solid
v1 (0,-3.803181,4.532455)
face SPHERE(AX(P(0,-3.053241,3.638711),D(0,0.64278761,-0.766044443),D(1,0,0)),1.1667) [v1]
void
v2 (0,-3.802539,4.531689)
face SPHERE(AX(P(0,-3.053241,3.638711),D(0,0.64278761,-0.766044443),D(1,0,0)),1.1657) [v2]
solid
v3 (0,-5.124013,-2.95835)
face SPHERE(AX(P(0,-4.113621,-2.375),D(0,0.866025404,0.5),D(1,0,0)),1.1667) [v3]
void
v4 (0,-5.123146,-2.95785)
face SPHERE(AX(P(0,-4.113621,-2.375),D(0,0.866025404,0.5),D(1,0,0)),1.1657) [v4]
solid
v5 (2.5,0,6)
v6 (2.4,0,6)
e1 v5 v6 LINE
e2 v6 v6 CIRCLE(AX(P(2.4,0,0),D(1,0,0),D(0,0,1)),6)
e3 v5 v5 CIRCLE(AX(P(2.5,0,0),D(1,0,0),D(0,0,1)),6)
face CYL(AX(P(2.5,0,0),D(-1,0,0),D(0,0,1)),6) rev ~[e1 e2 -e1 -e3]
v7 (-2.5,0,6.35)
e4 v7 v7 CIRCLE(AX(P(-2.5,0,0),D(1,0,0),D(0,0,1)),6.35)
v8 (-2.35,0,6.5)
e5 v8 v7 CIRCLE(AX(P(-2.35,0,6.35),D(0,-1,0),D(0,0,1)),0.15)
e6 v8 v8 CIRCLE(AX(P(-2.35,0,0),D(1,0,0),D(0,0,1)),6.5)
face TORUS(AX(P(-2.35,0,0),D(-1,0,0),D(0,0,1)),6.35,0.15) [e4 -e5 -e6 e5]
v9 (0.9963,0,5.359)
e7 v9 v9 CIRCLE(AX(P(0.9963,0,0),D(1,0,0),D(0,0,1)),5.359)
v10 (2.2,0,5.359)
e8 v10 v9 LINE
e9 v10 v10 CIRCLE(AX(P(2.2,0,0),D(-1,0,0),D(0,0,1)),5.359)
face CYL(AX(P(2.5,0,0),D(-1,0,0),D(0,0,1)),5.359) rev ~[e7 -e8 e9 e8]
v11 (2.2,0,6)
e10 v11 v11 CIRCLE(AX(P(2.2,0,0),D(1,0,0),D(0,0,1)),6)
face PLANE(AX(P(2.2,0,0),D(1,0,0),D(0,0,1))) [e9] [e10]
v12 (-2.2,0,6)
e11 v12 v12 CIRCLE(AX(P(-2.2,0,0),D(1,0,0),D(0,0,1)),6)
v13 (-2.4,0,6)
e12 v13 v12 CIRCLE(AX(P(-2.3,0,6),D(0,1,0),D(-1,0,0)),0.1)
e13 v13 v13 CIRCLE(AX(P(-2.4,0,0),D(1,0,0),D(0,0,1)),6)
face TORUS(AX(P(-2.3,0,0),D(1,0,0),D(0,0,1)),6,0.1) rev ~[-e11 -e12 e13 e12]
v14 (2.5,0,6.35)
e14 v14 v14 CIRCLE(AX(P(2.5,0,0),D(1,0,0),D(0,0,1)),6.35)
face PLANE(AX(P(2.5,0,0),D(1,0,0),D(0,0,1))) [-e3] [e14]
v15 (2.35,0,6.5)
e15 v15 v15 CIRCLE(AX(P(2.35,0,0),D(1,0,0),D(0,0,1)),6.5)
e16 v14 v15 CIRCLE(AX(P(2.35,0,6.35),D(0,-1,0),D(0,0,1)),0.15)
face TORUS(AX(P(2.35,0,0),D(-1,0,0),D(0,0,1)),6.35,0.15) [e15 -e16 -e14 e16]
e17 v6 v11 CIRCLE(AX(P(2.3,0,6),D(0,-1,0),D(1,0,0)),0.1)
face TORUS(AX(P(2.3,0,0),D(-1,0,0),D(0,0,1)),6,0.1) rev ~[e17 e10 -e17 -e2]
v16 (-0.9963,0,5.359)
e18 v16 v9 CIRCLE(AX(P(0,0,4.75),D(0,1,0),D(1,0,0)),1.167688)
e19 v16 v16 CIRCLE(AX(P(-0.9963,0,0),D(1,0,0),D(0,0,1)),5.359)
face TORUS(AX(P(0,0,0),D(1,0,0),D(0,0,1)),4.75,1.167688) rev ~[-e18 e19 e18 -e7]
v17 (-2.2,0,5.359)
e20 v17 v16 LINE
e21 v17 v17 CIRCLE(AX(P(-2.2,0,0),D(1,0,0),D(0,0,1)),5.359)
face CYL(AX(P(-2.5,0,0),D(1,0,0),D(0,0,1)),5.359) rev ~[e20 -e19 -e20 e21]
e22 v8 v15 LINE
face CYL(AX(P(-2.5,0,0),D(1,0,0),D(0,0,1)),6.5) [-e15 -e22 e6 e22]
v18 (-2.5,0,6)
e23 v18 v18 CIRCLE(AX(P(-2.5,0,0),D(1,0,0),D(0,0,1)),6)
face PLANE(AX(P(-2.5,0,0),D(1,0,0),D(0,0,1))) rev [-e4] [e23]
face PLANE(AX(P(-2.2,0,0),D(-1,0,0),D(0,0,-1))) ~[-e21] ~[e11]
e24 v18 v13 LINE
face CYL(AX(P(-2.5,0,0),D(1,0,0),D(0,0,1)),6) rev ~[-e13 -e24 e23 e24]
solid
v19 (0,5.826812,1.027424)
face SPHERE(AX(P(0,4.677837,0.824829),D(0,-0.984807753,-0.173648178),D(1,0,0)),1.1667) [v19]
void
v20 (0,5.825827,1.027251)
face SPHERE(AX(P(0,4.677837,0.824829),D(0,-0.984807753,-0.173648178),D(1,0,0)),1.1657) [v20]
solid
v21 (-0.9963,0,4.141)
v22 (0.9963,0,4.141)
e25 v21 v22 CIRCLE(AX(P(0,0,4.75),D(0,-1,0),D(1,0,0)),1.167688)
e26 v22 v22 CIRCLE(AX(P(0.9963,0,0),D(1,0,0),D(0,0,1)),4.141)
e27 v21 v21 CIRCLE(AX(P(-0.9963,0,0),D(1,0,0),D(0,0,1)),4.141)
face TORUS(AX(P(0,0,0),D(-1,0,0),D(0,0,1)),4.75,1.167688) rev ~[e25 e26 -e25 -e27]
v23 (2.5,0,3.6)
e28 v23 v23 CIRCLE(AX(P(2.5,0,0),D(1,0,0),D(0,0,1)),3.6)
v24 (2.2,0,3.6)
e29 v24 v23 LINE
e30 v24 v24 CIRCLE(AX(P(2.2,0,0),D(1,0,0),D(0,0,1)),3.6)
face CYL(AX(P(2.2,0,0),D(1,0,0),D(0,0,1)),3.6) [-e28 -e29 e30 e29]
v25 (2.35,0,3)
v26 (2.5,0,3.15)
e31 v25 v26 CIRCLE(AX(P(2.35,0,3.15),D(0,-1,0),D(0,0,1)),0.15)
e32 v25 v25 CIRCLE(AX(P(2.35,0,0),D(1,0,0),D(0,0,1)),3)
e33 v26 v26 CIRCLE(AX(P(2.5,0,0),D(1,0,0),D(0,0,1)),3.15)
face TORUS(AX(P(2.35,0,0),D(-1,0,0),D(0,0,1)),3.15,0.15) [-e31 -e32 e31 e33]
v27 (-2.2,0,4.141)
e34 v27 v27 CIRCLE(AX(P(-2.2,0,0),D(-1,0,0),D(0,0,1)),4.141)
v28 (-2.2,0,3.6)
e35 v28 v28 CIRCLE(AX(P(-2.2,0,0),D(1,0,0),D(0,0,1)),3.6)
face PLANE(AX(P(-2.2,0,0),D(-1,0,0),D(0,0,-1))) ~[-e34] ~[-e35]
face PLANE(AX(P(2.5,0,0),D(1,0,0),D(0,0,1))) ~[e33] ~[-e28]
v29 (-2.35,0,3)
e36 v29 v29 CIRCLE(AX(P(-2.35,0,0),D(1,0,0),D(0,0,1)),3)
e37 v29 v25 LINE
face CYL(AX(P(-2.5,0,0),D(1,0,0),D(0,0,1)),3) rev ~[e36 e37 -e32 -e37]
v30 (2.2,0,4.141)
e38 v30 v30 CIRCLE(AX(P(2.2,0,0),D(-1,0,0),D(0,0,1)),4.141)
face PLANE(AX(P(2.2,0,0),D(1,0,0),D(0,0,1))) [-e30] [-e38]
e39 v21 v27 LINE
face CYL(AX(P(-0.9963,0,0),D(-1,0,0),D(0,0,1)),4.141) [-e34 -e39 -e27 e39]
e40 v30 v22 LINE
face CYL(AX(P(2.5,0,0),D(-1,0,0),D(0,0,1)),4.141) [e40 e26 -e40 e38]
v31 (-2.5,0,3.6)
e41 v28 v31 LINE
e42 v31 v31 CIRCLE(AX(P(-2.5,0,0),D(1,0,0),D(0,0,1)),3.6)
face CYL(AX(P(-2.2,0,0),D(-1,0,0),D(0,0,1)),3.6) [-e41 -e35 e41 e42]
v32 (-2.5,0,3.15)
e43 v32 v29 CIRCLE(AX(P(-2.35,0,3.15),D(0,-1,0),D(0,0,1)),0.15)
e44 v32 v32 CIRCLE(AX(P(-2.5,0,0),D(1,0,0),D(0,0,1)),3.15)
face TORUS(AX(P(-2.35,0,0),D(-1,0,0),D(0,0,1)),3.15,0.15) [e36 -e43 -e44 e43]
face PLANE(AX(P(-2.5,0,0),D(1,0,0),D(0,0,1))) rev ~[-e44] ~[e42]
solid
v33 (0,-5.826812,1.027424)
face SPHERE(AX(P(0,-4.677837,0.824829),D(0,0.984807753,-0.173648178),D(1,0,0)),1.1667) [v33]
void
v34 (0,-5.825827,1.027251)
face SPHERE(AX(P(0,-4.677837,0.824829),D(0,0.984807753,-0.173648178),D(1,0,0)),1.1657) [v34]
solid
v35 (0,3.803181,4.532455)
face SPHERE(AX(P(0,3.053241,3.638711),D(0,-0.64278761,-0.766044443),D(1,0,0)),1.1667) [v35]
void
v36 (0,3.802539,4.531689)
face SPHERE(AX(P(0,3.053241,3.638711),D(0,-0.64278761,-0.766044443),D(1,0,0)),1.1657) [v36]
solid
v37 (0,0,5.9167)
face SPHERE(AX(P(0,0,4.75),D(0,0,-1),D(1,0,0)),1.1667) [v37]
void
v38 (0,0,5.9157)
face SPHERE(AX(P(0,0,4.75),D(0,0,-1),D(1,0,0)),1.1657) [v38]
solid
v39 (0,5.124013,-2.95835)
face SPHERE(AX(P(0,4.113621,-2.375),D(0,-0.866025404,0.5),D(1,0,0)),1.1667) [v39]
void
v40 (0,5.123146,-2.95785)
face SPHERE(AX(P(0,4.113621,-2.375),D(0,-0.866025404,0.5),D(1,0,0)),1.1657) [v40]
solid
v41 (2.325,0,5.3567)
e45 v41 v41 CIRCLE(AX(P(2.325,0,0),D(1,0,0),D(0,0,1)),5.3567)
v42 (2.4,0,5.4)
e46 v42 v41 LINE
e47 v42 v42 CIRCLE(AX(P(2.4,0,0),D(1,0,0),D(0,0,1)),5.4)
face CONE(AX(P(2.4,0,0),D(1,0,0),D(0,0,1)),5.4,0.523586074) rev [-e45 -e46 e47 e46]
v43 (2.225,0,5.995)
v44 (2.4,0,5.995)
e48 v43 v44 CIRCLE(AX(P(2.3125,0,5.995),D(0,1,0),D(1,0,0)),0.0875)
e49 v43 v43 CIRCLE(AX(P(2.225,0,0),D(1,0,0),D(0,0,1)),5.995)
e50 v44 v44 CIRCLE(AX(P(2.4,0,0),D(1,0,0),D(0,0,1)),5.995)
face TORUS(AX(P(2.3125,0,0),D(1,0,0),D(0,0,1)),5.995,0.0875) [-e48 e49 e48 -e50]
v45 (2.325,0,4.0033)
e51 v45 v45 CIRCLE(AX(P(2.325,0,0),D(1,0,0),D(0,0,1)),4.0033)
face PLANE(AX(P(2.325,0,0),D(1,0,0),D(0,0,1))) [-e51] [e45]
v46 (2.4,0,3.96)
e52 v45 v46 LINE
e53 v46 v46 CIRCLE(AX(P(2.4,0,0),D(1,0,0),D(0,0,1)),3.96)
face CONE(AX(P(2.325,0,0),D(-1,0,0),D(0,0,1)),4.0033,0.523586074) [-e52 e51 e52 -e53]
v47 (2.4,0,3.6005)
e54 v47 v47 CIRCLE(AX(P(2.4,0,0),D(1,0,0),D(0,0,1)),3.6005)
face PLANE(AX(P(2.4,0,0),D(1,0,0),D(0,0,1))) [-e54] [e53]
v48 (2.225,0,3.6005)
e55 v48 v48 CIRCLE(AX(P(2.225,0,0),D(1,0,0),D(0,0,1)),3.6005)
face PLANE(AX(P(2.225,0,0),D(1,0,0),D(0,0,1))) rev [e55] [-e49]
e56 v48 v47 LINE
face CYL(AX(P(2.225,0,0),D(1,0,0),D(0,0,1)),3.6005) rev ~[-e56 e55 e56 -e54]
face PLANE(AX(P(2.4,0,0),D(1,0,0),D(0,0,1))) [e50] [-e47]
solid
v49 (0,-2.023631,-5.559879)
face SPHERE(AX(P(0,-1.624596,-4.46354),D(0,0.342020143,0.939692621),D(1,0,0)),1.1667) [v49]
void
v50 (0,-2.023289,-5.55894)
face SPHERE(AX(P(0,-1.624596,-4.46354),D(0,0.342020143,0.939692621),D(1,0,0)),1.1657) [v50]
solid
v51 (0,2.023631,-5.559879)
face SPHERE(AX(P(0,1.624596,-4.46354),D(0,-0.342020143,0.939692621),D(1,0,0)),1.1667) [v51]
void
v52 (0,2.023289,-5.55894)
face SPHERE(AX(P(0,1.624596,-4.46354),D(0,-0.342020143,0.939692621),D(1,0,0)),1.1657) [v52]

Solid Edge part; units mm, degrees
sketch "Sketch1" plane through (0, 0, 0) normal (0, -1, 0) x (1, 0, 0)
  arc A0 (0, 5.9167) -> (0, 3.5833) centre (0, 4.75) cw
  dimension "D1" = 1.1667
revolve "RevolvedProtrusion1" add sketch "Sketch1" angle 360 about axis through (0, 0, 30.6346) along (0, 0, 1)
shell "Thinwall1" thickness 0.001 removed faces 0
pattern_circular "Pattern1" count 9 over 360 about axis through (0, 0, 0) along (1, 0, 0) of "RevolvedProtrusion1", "Thinwall1"
sketch "Sketch2" plane through (0, 0, 0) normal (0, -1, 0) x (1, 0, 0)
  line L0 (-2.5, 4.141) -> (-2.5, 3)
  line L1 (-2.5, 3) -> (2.5, 3)
  line L2 (2.5, 3) -> (2.5, 4.141)
  line L3 (2.5, 4.141) -> (0.9963, 4.141)
  arc A0 (-0.9963, 4.141) -> (0.9963, 4.141) centre (0, 4.75) ccw
  line L4 (-0.9963, 4.141) -> (-2.5, 4.141)
  line L5 (-2.5, 5.359) -> (-0.9963, 5.359)
  arc A1 (-0.9963, 5.359) -> (0.9963, 5.359) centre (0, 4.75) cw
  line L6 (2.5, 5.359) -> (0.9963, 5.359)
  line L7 (2.5, 6.5) -> (2.5, 5.359)
  line L8 (-2.5, 6.5) -> (2.5, 6.5)
  line L9 (-2.5, 5.359) -> (-2.5, 6.5)
  dimension "D1" = 5
  dimension "D2" = 1.1677
  dimension "D3" = 1.1677
revolve "RevolvedProtrusion2" add sketch "Sketch2" angle 360 about axis through (-60, 0, 0) along (1, 0, 0)
fillet "Round1" radius 0.15 4 edges at (-2.5, 0, -6.5) (2.5, 0, -6.5) (2.5, 0, -3) (-2.5, 0, -3)
sketch "Sketch3" plane through (0, 0, 0) normal (0, -1, 0) x (1, 0, 0)
  line L0 (2.5, 6) -> (2.4, 6)
  arc A0 (2.4, 6) -> (2.2, 6) centre (2.3, 6) ccw
  line L1 (2.2, 6) -> (2.2, 3.6)
  line L2 (2.2, 3.6) -> (2.5, 3.6)
  line L3 (2.5, 3.6) -> (2.5, 6)
  dimension "D1" = 0.1
  dimension "D2" = 0.3
  dimension "D3" = 2.5
revolve "RevolvedCutout1" cut sketch "Sketch3" angle 360 about axis through (-60, 0, 0) along (1, 0, 0)
mirror "Mirror1" about plane through (0, 0, 0) normal (1, 0, 0) of "RevolvedCutout1"
sketch "Sketch4" plane through (0, 0, 0) normal (0, -1, 0) x (1, 0, 0)
  line L0 (2.225, 3.6005) -> (2.225, 5.995)
  arc A0 (2.225, 5.995) -> (2.4, 5.995) centre (2.3125, 5.995) cw
  line L1 (2.4, 5.995) -> (2.4, 5.4)
  line L2 (2.4, 5.4) -> (2.325, 5.3567)
  line L3 (2.325, 5.3567) -> (2.325, 4.0033)
  line L4 (2.325, 4.0033) -> (2.4, 3.96)
  line L5 (2.4, 3.96) -> (2.4, 3.6005)
  line L6 (2.225, 3.6005) -> (2.4, 3.6005)
  dimension "D1" = 0.175
  dimension "D2" = 0.1
  dimension "D3" = 2.4
revolve "RevolvedProtrusion3" add sketch "Sketch4" angle 360 about axis through (-60, 0, 0) along (1, 0, 0)
properties material "Stahl"
